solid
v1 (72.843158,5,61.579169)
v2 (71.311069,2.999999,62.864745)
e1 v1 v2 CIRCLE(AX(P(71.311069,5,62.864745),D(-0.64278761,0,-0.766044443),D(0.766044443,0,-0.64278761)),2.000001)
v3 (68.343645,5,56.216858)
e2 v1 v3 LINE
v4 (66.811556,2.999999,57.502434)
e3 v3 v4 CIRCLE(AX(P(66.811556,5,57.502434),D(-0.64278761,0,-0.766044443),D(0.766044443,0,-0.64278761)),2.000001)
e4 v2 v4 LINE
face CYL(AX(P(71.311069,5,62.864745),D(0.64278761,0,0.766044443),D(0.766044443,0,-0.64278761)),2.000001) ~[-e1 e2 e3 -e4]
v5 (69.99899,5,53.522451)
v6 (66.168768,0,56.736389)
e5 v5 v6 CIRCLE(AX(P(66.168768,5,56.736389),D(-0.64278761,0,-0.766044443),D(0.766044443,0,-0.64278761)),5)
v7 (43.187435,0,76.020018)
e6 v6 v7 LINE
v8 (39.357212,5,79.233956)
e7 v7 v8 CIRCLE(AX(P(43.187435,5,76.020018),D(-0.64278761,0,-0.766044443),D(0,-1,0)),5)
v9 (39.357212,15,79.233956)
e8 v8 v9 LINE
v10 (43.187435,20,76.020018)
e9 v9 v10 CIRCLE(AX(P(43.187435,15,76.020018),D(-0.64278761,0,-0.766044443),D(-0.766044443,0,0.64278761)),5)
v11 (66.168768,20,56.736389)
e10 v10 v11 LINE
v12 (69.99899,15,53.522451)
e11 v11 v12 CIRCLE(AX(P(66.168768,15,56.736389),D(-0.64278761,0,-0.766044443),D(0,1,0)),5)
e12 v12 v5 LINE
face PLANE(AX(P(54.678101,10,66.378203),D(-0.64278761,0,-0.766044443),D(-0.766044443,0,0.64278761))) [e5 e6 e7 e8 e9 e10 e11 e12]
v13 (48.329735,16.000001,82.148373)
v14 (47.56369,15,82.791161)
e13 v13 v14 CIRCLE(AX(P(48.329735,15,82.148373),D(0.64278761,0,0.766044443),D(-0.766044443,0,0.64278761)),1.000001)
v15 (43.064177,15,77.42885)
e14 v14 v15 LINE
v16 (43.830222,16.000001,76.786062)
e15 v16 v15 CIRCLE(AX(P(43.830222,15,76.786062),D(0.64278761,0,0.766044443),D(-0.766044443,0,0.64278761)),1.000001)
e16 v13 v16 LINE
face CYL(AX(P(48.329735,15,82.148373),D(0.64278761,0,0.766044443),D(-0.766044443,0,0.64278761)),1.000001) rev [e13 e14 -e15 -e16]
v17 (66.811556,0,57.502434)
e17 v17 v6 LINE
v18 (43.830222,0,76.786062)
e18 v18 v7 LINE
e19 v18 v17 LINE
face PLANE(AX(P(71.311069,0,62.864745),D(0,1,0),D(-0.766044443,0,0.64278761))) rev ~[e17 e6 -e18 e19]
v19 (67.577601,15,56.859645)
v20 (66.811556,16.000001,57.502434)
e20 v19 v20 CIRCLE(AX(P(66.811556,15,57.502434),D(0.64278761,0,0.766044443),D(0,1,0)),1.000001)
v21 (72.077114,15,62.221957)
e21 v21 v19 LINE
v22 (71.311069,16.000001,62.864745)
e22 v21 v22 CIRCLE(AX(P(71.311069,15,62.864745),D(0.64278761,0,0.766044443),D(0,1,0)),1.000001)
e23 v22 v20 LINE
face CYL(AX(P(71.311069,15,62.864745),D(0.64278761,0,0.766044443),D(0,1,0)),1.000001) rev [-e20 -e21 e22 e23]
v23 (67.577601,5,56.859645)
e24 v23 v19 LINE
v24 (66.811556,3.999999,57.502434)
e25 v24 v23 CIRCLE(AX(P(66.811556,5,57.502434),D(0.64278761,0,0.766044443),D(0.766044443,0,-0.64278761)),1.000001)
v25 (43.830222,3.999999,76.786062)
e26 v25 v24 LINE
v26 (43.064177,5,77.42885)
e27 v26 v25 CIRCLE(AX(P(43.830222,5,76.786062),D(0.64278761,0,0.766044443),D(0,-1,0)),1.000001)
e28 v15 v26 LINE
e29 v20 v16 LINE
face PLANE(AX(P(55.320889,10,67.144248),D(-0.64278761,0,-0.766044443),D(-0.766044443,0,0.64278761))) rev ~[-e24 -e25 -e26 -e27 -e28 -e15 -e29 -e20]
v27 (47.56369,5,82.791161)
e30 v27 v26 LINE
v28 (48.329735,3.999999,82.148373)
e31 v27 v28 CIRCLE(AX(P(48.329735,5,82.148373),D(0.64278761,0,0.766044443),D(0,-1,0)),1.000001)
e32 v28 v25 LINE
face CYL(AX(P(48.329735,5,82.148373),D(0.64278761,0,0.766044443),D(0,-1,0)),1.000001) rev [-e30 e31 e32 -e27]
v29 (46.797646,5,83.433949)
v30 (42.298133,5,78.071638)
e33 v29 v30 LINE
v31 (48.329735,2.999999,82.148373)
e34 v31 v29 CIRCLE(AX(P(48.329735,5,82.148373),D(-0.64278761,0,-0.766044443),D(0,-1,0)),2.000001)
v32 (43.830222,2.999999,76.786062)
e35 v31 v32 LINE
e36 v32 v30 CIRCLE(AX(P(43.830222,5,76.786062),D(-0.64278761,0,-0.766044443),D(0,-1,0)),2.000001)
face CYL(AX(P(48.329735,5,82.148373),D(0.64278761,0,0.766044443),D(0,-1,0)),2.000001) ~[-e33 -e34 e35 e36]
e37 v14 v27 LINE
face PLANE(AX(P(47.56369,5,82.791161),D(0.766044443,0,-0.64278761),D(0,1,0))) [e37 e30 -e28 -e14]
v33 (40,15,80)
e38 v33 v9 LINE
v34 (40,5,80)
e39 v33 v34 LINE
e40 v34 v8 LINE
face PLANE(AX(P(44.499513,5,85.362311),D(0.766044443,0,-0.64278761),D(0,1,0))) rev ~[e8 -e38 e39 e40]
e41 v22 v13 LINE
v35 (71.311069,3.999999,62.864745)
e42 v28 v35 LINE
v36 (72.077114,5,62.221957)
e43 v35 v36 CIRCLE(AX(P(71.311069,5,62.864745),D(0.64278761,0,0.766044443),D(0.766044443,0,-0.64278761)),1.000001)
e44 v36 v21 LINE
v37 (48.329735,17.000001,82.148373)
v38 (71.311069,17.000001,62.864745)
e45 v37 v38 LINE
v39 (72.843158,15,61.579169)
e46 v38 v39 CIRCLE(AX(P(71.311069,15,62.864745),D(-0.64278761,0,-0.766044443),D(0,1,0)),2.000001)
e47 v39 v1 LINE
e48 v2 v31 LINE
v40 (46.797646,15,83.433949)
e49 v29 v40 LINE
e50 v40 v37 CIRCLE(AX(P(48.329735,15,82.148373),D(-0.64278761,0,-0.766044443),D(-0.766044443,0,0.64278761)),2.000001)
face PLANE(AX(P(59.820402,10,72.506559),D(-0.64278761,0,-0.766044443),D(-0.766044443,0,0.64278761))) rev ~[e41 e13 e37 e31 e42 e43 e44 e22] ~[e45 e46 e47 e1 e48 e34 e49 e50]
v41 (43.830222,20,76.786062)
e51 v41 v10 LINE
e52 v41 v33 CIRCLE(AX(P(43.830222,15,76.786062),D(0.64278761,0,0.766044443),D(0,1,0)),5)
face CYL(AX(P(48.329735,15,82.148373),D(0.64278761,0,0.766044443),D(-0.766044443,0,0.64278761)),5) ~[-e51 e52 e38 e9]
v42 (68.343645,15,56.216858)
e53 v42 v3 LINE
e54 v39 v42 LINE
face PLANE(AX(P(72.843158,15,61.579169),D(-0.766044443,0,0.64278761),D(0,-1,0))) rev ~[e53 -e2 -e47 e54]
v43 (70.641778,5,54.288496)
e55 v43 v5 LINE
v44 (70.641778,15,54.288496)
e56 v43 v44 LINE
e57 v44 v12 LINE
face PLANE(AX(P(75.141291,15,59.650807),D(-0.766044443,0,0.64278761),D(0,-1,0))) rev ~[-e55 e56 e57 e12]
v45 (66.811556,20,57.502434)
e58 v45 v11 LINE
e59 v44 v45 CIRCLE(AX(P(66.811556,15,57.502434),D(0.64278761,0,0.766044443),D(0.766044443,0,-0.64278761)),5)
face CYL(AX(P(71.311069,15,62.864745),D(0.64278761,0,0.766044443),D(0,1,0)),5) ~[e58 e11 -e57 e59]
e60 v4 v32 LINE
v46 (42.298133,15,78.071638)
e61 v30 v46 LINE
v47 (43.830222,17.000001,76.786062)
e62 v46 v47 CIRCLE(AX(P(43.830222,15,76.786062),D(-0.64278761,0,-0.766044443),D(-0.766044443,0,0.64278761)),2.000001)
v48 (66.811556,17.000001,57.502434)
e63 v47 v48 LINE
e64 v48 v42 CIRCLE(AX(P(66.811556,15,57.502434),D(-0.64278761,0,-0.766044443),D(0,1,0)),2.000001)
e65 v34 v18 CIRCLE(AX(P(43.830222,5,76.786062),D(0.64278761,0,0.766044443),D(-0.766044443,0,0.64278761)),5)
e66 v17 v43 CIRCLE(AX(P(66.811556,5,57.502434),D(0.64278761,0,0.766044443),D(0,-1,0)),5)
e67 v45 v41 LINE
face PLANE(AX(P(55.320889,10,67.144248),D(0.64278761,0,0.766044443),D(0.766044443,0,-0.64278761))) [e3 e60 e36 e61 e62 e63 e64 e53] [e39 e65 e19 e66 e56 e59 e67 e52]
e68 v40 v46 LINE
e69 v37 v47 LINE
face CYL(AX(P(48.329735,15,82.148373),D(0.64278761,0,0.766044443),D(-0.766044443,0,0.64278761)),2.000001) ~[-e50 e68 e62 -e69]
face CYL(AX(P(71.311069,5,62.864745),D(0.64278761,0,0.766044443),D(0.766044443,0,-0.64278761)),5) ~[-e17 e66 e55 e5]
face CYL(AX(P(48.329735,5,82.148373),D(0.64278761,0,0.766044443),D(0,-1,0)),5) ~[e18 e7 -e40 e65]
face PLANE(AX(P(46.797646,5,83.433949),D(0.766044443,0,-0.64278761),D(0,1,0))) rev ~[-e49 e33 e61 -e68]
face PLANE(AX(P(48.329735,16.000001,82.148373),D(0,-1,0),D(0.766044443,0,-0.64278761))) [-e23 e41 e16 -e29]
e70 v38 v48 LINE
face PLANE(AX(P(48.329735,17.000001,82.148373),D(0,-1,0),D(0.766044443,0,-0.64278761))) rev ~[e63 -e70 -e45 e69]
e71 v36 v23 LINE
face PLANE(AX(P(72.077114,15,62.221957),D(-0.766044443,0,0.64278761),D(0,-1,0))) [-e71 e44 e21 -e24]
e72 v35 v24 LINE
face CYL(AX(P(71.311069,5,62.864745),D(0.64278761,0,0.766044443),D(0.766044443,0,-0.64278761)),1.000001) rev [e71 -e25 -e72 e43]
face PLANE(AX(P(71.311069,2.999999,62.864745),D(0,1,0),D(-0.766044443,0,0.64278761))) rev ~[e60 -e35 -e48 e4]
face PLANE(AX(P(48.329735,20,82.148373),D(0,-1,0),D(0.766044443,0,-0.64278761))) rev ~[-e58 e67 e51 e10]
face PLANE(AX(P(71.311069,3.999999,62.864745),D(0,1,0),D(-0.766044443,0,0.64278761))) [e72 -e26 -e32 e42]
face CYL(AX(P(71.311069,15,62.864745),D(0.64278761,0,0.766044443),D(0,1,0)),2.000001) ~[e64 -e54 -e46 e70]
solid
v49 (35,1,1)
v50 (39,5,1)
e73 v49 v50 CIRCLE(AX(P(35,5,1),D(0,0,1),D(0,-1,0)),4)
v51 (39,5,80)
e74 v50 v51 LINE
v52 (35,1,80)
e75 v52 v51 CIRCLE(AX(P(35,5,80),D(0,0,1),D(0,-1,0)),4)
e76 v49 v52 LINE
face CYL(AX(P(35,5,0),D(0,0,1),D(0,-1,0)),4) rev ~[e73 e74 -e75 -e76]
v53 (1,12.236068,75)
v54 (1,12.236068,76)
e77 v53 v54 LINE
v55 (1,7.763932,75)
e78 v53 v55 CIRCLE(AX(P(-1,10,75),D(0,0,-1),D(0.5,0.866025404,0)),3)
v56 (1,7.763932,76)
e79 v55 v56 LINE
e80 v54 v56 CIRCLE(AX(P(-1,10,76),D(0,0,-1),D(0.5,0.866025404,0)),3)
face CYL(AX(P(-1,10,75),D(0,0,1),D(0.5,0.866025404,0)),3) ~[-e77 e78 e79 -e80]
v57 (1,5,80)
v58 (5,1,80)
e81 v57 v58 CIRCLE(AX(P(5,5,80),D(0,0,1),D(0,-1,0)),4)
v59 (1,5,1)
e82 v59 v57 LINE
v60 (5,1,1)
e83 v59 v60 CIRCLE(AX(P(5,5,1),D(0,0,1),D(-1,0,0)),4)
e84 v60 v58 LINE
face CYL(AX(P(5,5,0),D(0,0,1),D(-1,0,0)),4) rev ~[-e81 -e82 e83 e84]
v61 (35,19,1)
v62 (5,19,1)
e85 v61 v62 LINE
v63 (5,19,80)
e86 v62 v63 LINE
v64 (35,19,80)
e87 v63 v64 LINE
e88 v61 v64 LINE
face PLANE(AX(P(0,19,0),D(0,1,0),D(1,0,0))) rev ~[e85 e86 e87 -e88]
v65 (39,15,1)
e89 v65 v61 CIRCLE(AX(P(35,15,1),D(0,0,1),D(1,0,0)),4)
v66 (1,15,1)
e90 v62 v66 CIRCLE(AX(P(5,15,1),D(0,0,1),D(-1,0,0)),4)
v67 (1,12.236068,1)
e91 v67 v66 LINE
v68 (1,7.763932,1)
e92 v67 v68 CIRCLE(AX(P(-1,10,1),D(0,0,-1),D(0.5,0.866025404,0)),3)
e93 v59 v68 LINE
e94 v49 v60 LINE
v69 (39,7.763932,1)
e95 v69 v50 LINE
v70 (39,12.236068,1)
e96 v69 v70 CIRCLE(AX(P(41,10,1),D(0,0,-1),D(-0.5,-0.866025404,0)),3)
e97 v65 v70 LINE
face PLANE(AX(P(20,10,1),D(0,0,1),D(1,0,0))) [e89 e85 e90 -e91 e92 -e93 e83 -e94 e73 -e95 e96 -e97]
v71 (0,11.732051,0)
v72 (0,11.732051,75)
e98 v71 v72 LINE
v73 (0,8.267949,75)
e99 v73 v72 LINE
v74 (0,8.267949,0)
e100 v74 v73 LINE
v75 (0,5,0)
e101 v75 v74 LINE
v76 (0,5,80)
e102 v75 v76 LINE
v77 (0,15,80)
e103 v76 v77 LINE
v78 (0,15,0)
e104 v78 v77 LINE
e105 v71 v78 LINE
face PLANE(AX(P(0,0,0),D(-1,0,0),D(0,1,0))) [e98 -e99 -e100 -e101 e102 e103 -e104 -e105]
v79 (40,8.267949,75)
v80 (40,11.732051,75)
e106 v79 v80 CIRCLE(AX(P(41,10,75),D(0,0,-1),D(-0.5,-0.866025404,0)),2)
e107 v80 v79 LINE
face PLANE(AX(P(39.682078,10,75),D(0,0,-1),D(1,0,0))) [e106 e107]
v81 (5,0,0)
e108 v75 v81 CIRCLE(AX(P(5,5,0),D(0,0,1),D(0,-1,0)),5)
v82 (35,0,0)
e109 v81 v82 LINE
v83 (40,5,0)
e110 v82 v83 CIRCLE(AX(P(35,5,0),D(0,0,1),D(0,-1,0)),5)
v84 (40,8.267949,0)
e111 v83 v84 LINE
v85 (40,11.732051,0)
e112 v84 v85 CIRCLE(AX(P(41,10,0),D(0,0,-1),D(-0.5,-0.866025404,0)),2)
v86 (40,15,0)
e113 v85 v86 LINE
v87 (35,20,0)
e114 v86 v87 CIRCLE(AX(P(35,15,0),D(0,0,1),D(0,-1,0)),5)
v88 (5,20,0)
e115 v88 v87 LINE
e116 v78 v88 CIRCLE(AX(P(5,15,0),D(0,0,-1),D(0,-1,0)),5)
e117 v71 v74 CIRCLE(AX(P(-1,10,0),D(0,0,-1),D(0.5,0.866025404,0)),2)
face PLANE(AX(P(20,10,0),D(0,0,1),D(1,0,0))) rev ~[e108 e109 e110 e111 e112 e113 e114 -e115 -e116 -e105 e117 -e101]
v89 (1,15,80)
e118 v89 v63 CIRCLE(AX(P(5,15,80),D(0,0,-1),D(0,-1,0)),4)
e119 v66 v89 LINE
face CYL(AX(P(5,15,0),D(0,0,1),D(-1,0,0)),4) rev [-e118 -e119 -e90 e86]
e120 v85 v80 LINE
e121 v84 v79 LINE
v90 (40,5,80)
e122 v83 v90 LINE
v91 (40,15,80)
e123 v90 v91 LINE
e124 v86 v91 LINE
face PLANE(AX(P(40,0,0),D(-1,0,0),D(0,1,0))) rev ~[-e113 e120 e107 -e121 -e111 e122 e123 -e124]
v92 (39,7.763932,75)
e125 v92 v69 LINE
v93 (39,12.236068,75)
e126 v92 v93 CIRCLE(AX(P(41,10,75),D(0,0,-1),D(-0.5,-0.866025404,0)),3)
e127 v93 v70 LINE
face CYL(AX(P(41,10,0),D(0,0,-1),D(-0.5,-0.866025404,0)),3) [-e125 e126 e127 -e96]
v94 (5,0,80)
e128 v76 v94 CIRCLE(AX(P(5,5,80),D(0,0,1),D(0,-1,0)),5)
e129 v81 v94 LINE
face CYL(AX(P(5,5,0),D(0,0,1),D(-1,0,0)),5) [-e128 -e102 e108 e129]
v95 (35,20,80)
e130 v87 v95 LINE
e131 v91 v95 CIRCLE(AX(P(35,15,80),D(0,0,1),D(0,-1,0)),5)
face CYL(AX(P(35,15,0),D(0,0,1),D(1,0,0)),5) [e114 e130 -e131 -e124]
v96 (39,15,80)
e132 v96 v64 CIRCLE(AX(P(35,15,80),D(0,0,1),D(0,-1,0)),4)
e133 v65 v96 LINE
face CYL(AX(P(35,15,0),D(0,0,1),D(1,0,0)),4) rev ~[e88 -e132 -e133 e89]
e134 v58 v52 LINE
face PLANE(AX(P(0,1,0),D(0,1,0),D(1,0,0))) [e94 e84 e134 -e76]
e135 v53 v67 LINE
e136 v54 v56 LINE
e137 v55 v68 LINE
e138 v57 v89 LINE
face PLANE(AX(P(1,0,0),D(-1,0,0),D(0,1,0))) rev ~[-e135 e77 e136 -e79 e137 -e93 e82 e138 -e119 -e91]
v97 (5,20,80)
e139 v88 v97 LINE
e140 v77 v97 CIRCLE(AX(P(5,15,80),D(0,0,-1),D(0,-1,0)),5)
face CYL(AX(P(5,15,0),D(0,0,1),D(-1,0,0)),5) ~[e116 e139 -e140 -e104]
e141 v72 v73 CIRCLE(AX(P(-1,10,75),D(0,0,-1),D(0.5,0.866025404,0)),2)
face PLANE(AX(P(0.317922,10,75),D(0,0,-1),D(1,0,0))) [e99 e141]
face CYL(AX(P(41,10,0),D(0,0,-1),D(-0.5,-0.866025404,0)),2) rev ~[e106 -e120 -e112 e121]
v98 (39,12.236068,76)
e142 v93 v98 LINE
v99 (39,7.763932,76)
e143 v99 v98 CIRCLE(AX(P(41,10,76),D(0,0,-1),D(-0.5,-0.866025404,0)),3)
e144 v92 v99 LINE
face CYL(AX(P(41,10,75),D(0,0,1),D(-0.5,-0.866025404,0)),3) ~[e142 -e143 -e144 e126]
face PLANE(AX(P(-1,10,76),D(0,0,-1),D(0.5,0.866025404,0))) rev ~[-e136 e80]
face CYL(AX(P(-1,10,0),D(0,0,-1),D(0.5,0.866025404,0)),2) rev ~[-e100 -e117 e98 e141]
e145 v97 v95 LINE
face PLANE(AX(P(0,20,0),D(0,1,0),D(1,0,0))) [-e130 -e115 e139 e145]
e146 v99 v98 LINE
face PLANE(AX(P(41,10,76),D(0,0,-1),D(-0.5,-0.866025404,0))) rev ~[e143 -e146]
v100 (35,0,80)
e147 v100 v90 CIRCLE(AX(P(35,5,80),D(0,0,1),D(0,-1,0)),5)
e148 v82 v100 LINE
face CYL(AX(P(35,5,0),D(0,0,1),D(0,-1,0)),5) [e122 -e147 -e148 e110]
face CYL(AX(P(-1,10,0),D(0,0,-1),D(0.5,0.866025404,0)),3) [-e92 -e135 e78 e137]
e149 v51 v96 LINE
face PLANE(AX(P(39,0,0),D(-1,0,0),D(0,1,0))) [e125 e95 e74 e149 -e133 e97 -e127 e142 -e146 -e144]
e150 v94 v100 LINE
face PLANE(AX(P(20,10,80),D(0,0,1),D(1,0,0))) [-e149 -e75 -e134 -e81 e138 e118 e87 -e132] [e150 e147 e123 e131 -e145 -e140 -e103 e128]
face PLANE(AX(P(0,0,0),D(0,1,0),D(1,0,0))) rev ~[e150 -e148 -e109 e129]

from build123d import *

# Parameters (mm, degrees)
F0_W        = 40
F0_H        = 20
F1_DEPTH    = 80
F2_R        = 5
F4_DEPTH    = 75
F5_T        = 1
F5_T4_ANGLE = 120.000000001
F5_T6_ANGLE = 120.000000001
F7_DEPTH    = 8
F8_ANGLE    = 220
F11_DEPTH   = 7
F12_T       = -1


# Not quite as in the source:
# - a shell that OpenCascade refuses in one call is made with other operations: the cavity is built on its own and cut out


with BuildPart() as f1:
    # F0 (on Top) → F1 (new body)
    with BuildSketch(Plane.XY):
        with Locations((20, 10)):
            Rectangle(F0_W, F0_H)
    extrude(amount=F1_DEPTH)

    # F2
    f2_edges = [f1.edges().sort_by_distance(p)[0] for p in [
        (40, 0, 40),
        (0, 0, 40),
        (40, 20, 40),
        (0, 20, 40),
    ]]
    fillet(f2_edges, radius=F2_R)

    # F3 (on face) → F4 (cut)
    with BuildSketch(Plane(origin=(0, 0, 0), x_dir=(1, 0, 0), z_dir=(0, 0, -1))):
        with BuildLine():
            Line((0, -8.2679491924), (0, -11.7320508076))
            ThreePointArc((0, -11.7320508076), (1, -10), (0, -8.2679491924))
        make_face()
        with BuildLine():
            ThreePointArc((40, -8.2679491924), (39, -10), (40, -11.7320508076))
            Line((40, -11.7320508076), (40, -8.2679491924))
        make_face()
    extrude(amount=-F4_DEPTH, mode=Mode.SUBTRACT)

    # F5: shell of thickness 1, made by hand


with BuildPart() as f5_core1:
    # F5_t2: copy of F1
    add(f1.part)

    # the walls: a layer under each face that stays
    f5_faces = [f5_core1.faces().sort_by_distance(p)[0] for p in [
        (0, 13.3333333333, 66.6666666667),
        (20, 10, 0),
        (1, 10, 37.5),
        (0.5, 10, 75),
        (1.4644660941, 1.4644660941, 40),
        (1.4644660941, 18.5355339059, 40),
        (20, 20, 40),
        (38.5355339059, 18.5355339059, 40),
        (40, 6.6666666667, 66.6666666667),
        (39, 10, 37.5),
        (38.5355339059, 1.4644660941, 40),
        (20, 0, 40),
        (39.5, 10, 75),
    ]]
    thicken(f5_faces, amount=-F5_T, mode=Mode.SUBTRACT)

    # F5_s3 → F5_t4 (revolve, cut)
    with BuildSketch(Plane(origin=(-5.0801270189, 2.9330127019, 0), x_dir=(0, 0, 1), z_dir=(-0.8660254038, 0.5, 0))):
        Polygon((74.99, 10.1502540378), (75, 11.1602540378), (76, 11.1602540378), (76, 10.1602540378), align=None)
    revolve(axis=Axis((-1, 10, 75), (0, 0, -1)), revolution_arc=F5_T4_ANGLE, mode=Mode.SUBTRACT)

    # F5_s5 → F5_t6 (revolve, cut)
    with BuildSketch(Plane(origin=(26.4198729811, -15.2535207776, 0), x_dir=(0, 0, 1), z_dir=(0.8660254038, -0.5, 0))):
        Polygon((74.99, -27.1702540378), (75, -26.1602540378), (76, -26.1602540378), (76, -27.1602540378), align=None)
    revolve(axis=Axis((41, 10, 75), (0, 0, -1)), revolution_arc=F5_T6_ANGLE, mode=Mode.SUBTRACT)


with BuildPart() as f1_1:
    add(f1.part)

    # what is left inside the walls is the cavity
    f5_cavity = [f5_core1.part.solids().sort_by_distance(p)[0] for p in [
        (20, 1.01, 53.666667),
    ]]
    add(f5_cavity, mode=Mode.SUBTRACT)


with BuildPart() as f7:
    # F6 (on face) → F7 (new body)
    with BuildSketch(Plane.XY.offset(80)):
        with BuildLine():
            ThreePointArc((35, 0), (38.5355339059, 1.4644660941), (40, 5))
            Line((40, 5), (40, 15))
            ThreePointArc((40, 15), (38.5355339059, 18.5355339059), (35, 20))
            Line((35, 20), (5, 20))
            ThreePointArc((5, 20), (1.4644660941, 18.5355339059), (0, 15))
            Line((0, 15), (0, 5))
            ThreePointArc((0, 5), (1.4644660941, 1.4644660941), (5, 0))
            Line((5, 0), (35, 0))
        make_face()
    extrude(amount=F7_DEPTH)


with BuildPart() as f7_1:
    # F8: moved
    add(f7.part.rotate(Axis((40, 10, 80), (0, 1, 0)), F8_ANGLE))


with BuildPart() as f7_2:
    # F9: moved
    add(f7_1.part.moved(Location((4.4995132678, 0, 5.3623111018))))

    # F10 (on face) → F11 (cut)
    with BuildSketch(Plane(origin=(60.418859835, 0, 72.0043932688), x_dir=(0.7660444431, 0, -0.6427876097), z_dir=(0.6427876097, 0, 0.7660444431))):
        with BuildLine():
            ThreePointArc((19.2187689498, 15), (17.7543028558, 18.5355339059), (14.2187689498, 20))
            Line((14.2187689498, 20), (-15.7812310502, 20))
            ThreePointArc((-15.7812310502, 20), (-19.3167649561, 18.5355339059), (-20.7812310502, 15))
            Line((-20.7812310502, 15), (-20.7812310502, 5))
            ThreePointArc((-20.7812310502, 5), (-19.3167649561, 1.4644660941), (-15.7812310502, 0))
            Line((-15.7812310502, 0), (14.2187689498, 0))
            ThreePointArc((14.2187689498, 0), (17.7543028558, 1.4644660941), (19.2187689498, 5))
            Line((19.2187689498, 5), (19.2187689498, 15))
        make_face()
        with BuildLine():
            ThreePointArc((14.2187689498, 17.0000009239), (15.6329831655, 16.4142142156), (16.2187698737, 15))
            Line((16.2187698737, 15), (16.2187698737, 5))
            ThreePointArc((16.2187698737, 5), (15.6329831655, 3.5857857844), (14.2187689498, 2.9999990761))
            Line((14.2187689498, 2.9999990761), (-15.7812310502, 2.9999990761))
            ThreePointArc((-15.7812310502, 2.9999990761), (-17.1954452658, 3.5857857844), (-17.781231974, 5))
            Line((-17.781231974, 5), (-17.781231974, 15))
            ThreePointArc((-17.781231974, 15), (-17.1954452658, 16.4142142156), (-15.7812310502, 17.0000009239))
            Line((-15.7812310502, 17.0000009239), (14.2187689498, 17.0000009239))
        make_face(mode=Mode.SUBTRACT)
    extrude(amount=-F11_DEPTH, mode=Mode.SUBTRACT)

    # F12
    f12_openings = [f7_2.faces().sort_by_distance(p)[0] for p in [
        (59.820402, 10, 72.506559),
    ]]
    offset(amount=F12_T, openings=f12_openings, kind=Kind.INTERSECTION)


solid = Compound([f1_1.part, f7_2.part])
